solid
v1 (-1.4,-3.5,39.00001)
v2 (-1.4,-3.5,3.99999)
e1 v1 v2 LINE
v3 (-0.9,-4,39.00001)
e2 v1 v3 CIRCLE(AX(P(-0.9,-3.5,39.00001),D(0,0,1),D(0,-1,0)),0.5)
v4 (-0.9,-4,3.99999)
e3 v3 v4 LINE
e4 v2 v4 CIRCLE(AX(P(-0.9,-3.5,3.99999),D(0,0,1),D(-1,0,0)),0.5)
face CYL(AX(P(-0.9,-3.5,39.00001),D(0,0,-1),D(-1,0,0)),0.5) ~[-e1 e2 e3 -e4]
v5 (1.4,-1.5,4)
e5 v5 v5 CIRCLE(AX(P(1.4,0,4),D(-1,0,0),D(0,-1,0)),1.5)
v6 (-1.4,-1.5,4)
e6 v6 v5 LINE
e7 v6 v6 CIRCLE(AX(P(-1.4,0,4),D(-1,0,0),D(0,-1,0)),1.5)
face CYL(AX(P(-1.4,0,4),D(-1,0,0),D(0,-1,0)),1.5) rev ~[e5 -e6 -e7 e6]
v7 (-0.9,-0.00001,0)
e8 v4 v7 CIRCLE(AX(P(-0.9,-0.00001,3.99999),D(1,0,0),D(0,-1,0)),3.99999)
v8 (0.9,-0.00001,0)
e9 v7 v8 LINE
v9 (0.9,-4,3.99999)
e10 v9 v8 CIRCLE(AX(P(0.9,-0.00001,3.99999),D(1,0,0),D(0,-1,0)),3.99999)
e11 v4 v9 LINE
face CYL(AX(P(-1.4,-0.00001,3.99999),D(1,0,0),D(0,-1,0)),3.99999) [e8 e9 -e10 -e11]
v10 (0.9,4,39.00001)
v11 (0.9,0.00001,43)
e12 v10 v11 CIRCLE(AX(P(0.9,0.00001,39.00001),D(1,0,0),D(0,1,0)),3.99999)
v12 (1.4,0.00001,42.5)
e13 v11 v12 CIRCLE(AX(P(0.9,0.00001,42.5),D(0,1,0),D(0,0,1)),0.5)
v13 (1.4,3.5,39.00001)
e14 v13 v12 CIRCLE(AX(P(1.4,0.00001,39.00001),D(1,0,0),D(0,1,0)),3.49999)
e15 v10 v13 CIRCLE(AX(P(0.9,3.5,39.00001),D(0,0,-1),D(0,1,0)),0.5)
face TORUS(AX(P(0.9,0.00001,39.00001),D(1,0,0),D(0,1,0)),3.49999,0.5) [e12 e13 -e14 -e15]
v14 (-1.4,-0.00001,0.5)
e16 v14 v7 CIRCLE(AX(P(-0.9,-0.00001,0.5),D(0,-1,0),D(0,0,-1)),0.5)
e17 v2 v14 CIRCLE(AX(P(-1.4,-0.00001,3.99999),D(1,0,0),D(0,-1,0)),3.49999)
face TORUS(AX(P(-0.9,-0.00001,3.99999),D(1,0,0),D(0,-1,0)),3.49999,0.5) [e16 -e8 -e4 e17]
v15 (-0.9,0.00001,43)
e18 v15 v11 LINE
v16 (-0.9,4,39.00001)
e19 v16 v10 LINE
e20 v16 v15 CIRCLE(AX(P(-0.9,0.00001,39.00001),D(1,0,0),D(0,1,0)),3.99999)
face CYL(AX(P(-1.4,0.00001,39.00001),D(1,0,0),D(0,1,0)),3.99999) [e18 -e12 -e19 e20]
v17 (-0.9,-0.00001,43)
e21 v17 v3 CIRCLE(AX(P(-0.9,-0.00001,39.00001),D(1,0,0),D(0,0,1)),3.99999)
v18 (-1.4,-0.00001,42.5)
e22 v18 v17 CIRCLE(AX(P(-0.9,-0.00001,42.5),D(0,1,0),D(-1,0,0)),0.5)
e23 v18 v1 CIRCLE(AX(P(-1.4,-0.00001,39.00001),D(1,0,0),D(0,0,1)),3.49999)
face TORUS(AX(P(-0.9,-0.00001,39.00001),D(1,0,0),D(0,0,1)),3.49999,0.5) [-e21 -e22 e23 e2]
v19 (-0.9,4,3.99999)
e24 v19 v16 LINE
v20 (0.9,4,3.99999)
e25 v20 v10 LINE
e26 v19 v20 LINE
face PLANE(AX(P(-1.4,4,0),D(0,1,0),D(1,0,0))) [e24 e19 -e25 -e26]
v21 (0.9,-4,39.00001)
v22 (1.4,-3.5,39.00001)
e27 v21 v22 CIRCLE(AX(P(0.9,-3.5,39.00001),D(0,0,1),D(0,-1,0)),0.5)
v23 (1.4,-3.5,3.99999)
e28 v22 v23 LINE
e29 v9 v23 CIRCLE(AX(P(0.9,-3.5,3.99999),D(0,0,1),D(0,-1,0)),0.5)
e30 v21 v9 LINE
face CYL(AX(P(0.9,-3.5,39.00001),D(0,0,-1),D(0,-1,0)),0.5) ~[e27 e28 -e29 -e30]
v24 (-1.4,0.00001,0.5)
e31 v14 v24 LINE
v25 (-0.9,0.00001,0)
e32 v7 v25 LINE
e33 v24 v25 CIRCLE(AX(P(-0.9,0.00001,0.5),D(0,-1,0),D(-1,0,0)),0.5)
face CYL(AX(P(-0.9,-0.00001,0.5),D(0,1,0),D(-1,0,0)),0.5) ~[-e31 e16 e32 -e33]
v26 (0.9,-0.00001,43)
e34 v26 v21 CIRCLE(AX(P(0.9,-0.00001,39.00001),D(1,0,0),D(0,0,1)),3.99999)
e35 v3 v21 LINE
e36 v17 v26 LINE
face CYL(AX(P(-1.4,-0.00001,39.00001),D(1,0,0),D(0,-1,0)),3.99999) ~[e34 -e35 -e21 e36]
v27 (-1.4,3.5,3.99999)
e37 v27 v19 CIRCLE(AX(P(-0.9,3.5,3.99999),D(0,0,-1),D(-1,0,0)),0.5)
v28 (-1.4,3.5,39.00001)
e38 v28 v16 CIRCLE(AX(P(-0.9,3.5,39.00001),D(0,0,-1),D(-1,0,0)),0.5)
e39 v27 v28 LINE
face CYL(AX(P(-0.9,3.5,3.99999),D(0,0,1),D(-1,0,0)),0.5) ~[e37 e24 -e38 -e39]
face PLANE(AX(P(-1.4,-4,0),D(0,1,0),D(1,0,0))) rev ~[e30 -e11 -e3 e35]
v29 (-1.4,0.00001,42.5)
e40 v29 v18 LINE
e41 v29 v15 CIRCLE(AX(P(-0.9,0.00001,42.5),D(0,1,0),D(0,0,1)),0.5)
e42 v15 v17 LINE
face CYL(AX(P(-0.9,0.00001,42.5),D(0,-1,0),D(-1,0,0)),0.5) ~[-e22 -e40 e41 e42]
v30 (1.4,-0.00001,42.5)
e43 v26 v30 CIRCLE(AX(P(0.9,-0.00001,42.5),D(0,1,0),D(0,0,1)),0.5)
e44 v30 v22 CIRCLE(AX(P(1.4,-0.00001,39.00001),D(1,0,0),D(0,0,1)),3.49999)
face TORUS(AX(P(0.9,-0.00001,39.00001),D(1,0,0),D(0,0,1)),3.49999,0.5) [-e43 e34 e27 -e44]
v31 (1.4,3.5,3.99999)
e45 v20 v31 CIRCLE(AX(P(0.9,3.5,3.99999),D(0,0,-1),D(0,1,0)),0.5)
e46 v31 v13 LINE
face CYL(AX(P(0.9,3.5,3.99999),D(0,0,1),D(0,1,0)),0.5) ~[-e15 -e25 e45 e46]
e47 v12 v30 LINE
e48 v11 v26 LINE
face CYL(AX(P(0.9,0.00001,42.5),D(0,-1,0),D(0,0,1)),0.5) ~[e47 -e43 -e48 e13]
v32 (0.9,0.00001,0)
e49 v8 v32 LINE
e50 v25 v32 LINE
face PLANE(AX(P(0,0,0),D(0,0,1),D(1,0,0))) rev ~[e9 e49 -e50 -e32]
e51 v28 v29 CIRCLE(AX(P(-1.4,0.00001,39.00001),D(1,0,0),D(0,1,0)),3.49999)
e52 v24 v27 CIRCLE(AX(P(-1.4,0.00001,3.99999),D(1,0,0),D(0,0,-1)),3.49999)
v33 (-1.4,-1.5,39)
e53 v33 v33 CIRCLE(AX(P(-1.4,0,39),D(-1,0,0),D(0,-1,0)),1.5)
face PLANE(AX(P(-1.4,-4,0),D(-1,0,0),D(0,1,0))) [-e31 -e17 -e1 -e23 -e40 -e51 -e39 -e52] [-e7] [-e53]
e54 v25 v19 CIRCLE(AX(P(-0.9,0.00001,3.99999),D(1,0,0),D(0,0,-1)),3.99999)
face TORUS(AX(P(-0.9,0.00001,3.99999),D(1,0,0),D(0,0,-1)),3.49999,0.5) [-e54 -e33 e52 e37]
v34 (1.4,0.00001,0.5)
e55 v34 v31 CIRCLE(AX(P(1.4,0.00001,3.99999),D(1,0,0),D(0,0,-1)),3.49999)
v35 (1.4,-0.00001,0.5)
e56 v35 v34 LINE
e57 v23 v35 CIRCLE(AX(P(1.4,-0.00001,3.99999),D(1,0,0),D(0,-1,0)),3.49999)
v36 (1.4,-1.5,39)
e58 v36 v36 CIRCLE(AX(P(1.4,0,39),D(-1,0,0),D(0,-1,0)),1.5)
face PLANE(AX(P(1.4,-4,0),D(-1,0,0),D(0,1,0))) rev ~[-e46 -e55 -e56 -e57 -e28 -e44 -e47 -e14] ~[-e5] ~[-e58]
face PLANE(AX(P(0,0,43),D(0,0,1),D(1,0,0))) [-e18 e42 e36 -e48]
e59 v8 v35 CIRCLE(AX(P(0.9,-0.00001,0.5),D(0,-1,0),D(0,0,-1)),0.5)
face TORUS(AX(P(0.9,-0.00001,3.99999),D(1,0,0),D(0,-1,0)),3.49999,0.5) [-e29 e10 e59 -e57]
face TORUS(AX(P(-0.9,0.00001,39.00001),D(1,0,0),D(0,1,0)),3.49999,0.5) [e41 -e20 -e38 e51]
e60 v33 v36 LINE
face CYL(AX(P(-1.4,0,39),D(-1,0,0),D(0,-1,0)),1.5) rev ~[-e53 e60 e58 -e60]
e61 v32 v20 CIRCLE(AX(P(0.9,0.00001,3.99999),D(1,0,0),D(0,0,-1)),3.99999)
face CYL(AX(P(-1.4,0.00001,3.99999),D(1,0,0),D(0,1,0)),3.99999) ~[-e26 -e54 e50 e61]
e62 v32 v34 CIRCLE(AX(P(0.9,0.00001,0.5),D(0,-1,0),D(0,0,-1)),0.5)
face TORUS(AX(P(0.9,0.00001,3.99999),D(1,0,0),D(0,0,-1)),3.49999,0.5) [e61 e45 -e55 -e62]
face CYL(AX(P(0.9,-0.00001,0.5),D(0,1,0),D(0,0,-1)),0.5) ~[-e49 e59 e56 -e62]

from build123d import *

# Parameters (mm, degrees)
F0_W     = 2.8
F0_H     = 8
F1_DEPTH = 43
F2_R     = 3.99999
F3_R     = 1.5
F4_DEPTH = 5
F5_R     = 0.5


# Not quite as in the source:
# - a fillet or chamfer is up to 0.001 mm smaller than in the source, because OpenCascade refuses the exact size


with BuildPart() as f1:
    # F0 (on Top) → F1 (new body)
    with BuildSketch(Plane.XY):
        Rectangle(F0_W, F0_H)
    extrude(amount=F1_DEPTH)

    # F2 (radius 4 in the source; OpenCascade refuses exactly that, so slightly less here)
    f2_edges = [f1.edges().sort_by_distance(p)[0] for p in [
        (0, 4, 0),
        (0, -4, 0),
        (0, -4, 43),
        (0, 4, 43),
    ]]
    fillet(f2_edges, radius=F2_R)

    # F3 (on face) → F4 (cut)
    with BuildSketch(Plane(origin=(-1.4, 0, 0), x_dir=(0, -1, 0), z_dir=(-1, 0, 0))):
        with Locations((0, 4)):
            Circle(F3_R)
        with Locations((0, 39)):
            Circle(F3_R)
    extrude(amount=-F4_DEPTH, mode=Mode.SUBTRACT)

    # F5
    f5_edges = [f1.edges().sort_by_distance(p)[0] for p in [
        (-1.4, 4, 21.5),
        (1.4, 4, 21.5),
    ]]
    fillet(f5_edges, radius=F5_R)


solid = f1.part
